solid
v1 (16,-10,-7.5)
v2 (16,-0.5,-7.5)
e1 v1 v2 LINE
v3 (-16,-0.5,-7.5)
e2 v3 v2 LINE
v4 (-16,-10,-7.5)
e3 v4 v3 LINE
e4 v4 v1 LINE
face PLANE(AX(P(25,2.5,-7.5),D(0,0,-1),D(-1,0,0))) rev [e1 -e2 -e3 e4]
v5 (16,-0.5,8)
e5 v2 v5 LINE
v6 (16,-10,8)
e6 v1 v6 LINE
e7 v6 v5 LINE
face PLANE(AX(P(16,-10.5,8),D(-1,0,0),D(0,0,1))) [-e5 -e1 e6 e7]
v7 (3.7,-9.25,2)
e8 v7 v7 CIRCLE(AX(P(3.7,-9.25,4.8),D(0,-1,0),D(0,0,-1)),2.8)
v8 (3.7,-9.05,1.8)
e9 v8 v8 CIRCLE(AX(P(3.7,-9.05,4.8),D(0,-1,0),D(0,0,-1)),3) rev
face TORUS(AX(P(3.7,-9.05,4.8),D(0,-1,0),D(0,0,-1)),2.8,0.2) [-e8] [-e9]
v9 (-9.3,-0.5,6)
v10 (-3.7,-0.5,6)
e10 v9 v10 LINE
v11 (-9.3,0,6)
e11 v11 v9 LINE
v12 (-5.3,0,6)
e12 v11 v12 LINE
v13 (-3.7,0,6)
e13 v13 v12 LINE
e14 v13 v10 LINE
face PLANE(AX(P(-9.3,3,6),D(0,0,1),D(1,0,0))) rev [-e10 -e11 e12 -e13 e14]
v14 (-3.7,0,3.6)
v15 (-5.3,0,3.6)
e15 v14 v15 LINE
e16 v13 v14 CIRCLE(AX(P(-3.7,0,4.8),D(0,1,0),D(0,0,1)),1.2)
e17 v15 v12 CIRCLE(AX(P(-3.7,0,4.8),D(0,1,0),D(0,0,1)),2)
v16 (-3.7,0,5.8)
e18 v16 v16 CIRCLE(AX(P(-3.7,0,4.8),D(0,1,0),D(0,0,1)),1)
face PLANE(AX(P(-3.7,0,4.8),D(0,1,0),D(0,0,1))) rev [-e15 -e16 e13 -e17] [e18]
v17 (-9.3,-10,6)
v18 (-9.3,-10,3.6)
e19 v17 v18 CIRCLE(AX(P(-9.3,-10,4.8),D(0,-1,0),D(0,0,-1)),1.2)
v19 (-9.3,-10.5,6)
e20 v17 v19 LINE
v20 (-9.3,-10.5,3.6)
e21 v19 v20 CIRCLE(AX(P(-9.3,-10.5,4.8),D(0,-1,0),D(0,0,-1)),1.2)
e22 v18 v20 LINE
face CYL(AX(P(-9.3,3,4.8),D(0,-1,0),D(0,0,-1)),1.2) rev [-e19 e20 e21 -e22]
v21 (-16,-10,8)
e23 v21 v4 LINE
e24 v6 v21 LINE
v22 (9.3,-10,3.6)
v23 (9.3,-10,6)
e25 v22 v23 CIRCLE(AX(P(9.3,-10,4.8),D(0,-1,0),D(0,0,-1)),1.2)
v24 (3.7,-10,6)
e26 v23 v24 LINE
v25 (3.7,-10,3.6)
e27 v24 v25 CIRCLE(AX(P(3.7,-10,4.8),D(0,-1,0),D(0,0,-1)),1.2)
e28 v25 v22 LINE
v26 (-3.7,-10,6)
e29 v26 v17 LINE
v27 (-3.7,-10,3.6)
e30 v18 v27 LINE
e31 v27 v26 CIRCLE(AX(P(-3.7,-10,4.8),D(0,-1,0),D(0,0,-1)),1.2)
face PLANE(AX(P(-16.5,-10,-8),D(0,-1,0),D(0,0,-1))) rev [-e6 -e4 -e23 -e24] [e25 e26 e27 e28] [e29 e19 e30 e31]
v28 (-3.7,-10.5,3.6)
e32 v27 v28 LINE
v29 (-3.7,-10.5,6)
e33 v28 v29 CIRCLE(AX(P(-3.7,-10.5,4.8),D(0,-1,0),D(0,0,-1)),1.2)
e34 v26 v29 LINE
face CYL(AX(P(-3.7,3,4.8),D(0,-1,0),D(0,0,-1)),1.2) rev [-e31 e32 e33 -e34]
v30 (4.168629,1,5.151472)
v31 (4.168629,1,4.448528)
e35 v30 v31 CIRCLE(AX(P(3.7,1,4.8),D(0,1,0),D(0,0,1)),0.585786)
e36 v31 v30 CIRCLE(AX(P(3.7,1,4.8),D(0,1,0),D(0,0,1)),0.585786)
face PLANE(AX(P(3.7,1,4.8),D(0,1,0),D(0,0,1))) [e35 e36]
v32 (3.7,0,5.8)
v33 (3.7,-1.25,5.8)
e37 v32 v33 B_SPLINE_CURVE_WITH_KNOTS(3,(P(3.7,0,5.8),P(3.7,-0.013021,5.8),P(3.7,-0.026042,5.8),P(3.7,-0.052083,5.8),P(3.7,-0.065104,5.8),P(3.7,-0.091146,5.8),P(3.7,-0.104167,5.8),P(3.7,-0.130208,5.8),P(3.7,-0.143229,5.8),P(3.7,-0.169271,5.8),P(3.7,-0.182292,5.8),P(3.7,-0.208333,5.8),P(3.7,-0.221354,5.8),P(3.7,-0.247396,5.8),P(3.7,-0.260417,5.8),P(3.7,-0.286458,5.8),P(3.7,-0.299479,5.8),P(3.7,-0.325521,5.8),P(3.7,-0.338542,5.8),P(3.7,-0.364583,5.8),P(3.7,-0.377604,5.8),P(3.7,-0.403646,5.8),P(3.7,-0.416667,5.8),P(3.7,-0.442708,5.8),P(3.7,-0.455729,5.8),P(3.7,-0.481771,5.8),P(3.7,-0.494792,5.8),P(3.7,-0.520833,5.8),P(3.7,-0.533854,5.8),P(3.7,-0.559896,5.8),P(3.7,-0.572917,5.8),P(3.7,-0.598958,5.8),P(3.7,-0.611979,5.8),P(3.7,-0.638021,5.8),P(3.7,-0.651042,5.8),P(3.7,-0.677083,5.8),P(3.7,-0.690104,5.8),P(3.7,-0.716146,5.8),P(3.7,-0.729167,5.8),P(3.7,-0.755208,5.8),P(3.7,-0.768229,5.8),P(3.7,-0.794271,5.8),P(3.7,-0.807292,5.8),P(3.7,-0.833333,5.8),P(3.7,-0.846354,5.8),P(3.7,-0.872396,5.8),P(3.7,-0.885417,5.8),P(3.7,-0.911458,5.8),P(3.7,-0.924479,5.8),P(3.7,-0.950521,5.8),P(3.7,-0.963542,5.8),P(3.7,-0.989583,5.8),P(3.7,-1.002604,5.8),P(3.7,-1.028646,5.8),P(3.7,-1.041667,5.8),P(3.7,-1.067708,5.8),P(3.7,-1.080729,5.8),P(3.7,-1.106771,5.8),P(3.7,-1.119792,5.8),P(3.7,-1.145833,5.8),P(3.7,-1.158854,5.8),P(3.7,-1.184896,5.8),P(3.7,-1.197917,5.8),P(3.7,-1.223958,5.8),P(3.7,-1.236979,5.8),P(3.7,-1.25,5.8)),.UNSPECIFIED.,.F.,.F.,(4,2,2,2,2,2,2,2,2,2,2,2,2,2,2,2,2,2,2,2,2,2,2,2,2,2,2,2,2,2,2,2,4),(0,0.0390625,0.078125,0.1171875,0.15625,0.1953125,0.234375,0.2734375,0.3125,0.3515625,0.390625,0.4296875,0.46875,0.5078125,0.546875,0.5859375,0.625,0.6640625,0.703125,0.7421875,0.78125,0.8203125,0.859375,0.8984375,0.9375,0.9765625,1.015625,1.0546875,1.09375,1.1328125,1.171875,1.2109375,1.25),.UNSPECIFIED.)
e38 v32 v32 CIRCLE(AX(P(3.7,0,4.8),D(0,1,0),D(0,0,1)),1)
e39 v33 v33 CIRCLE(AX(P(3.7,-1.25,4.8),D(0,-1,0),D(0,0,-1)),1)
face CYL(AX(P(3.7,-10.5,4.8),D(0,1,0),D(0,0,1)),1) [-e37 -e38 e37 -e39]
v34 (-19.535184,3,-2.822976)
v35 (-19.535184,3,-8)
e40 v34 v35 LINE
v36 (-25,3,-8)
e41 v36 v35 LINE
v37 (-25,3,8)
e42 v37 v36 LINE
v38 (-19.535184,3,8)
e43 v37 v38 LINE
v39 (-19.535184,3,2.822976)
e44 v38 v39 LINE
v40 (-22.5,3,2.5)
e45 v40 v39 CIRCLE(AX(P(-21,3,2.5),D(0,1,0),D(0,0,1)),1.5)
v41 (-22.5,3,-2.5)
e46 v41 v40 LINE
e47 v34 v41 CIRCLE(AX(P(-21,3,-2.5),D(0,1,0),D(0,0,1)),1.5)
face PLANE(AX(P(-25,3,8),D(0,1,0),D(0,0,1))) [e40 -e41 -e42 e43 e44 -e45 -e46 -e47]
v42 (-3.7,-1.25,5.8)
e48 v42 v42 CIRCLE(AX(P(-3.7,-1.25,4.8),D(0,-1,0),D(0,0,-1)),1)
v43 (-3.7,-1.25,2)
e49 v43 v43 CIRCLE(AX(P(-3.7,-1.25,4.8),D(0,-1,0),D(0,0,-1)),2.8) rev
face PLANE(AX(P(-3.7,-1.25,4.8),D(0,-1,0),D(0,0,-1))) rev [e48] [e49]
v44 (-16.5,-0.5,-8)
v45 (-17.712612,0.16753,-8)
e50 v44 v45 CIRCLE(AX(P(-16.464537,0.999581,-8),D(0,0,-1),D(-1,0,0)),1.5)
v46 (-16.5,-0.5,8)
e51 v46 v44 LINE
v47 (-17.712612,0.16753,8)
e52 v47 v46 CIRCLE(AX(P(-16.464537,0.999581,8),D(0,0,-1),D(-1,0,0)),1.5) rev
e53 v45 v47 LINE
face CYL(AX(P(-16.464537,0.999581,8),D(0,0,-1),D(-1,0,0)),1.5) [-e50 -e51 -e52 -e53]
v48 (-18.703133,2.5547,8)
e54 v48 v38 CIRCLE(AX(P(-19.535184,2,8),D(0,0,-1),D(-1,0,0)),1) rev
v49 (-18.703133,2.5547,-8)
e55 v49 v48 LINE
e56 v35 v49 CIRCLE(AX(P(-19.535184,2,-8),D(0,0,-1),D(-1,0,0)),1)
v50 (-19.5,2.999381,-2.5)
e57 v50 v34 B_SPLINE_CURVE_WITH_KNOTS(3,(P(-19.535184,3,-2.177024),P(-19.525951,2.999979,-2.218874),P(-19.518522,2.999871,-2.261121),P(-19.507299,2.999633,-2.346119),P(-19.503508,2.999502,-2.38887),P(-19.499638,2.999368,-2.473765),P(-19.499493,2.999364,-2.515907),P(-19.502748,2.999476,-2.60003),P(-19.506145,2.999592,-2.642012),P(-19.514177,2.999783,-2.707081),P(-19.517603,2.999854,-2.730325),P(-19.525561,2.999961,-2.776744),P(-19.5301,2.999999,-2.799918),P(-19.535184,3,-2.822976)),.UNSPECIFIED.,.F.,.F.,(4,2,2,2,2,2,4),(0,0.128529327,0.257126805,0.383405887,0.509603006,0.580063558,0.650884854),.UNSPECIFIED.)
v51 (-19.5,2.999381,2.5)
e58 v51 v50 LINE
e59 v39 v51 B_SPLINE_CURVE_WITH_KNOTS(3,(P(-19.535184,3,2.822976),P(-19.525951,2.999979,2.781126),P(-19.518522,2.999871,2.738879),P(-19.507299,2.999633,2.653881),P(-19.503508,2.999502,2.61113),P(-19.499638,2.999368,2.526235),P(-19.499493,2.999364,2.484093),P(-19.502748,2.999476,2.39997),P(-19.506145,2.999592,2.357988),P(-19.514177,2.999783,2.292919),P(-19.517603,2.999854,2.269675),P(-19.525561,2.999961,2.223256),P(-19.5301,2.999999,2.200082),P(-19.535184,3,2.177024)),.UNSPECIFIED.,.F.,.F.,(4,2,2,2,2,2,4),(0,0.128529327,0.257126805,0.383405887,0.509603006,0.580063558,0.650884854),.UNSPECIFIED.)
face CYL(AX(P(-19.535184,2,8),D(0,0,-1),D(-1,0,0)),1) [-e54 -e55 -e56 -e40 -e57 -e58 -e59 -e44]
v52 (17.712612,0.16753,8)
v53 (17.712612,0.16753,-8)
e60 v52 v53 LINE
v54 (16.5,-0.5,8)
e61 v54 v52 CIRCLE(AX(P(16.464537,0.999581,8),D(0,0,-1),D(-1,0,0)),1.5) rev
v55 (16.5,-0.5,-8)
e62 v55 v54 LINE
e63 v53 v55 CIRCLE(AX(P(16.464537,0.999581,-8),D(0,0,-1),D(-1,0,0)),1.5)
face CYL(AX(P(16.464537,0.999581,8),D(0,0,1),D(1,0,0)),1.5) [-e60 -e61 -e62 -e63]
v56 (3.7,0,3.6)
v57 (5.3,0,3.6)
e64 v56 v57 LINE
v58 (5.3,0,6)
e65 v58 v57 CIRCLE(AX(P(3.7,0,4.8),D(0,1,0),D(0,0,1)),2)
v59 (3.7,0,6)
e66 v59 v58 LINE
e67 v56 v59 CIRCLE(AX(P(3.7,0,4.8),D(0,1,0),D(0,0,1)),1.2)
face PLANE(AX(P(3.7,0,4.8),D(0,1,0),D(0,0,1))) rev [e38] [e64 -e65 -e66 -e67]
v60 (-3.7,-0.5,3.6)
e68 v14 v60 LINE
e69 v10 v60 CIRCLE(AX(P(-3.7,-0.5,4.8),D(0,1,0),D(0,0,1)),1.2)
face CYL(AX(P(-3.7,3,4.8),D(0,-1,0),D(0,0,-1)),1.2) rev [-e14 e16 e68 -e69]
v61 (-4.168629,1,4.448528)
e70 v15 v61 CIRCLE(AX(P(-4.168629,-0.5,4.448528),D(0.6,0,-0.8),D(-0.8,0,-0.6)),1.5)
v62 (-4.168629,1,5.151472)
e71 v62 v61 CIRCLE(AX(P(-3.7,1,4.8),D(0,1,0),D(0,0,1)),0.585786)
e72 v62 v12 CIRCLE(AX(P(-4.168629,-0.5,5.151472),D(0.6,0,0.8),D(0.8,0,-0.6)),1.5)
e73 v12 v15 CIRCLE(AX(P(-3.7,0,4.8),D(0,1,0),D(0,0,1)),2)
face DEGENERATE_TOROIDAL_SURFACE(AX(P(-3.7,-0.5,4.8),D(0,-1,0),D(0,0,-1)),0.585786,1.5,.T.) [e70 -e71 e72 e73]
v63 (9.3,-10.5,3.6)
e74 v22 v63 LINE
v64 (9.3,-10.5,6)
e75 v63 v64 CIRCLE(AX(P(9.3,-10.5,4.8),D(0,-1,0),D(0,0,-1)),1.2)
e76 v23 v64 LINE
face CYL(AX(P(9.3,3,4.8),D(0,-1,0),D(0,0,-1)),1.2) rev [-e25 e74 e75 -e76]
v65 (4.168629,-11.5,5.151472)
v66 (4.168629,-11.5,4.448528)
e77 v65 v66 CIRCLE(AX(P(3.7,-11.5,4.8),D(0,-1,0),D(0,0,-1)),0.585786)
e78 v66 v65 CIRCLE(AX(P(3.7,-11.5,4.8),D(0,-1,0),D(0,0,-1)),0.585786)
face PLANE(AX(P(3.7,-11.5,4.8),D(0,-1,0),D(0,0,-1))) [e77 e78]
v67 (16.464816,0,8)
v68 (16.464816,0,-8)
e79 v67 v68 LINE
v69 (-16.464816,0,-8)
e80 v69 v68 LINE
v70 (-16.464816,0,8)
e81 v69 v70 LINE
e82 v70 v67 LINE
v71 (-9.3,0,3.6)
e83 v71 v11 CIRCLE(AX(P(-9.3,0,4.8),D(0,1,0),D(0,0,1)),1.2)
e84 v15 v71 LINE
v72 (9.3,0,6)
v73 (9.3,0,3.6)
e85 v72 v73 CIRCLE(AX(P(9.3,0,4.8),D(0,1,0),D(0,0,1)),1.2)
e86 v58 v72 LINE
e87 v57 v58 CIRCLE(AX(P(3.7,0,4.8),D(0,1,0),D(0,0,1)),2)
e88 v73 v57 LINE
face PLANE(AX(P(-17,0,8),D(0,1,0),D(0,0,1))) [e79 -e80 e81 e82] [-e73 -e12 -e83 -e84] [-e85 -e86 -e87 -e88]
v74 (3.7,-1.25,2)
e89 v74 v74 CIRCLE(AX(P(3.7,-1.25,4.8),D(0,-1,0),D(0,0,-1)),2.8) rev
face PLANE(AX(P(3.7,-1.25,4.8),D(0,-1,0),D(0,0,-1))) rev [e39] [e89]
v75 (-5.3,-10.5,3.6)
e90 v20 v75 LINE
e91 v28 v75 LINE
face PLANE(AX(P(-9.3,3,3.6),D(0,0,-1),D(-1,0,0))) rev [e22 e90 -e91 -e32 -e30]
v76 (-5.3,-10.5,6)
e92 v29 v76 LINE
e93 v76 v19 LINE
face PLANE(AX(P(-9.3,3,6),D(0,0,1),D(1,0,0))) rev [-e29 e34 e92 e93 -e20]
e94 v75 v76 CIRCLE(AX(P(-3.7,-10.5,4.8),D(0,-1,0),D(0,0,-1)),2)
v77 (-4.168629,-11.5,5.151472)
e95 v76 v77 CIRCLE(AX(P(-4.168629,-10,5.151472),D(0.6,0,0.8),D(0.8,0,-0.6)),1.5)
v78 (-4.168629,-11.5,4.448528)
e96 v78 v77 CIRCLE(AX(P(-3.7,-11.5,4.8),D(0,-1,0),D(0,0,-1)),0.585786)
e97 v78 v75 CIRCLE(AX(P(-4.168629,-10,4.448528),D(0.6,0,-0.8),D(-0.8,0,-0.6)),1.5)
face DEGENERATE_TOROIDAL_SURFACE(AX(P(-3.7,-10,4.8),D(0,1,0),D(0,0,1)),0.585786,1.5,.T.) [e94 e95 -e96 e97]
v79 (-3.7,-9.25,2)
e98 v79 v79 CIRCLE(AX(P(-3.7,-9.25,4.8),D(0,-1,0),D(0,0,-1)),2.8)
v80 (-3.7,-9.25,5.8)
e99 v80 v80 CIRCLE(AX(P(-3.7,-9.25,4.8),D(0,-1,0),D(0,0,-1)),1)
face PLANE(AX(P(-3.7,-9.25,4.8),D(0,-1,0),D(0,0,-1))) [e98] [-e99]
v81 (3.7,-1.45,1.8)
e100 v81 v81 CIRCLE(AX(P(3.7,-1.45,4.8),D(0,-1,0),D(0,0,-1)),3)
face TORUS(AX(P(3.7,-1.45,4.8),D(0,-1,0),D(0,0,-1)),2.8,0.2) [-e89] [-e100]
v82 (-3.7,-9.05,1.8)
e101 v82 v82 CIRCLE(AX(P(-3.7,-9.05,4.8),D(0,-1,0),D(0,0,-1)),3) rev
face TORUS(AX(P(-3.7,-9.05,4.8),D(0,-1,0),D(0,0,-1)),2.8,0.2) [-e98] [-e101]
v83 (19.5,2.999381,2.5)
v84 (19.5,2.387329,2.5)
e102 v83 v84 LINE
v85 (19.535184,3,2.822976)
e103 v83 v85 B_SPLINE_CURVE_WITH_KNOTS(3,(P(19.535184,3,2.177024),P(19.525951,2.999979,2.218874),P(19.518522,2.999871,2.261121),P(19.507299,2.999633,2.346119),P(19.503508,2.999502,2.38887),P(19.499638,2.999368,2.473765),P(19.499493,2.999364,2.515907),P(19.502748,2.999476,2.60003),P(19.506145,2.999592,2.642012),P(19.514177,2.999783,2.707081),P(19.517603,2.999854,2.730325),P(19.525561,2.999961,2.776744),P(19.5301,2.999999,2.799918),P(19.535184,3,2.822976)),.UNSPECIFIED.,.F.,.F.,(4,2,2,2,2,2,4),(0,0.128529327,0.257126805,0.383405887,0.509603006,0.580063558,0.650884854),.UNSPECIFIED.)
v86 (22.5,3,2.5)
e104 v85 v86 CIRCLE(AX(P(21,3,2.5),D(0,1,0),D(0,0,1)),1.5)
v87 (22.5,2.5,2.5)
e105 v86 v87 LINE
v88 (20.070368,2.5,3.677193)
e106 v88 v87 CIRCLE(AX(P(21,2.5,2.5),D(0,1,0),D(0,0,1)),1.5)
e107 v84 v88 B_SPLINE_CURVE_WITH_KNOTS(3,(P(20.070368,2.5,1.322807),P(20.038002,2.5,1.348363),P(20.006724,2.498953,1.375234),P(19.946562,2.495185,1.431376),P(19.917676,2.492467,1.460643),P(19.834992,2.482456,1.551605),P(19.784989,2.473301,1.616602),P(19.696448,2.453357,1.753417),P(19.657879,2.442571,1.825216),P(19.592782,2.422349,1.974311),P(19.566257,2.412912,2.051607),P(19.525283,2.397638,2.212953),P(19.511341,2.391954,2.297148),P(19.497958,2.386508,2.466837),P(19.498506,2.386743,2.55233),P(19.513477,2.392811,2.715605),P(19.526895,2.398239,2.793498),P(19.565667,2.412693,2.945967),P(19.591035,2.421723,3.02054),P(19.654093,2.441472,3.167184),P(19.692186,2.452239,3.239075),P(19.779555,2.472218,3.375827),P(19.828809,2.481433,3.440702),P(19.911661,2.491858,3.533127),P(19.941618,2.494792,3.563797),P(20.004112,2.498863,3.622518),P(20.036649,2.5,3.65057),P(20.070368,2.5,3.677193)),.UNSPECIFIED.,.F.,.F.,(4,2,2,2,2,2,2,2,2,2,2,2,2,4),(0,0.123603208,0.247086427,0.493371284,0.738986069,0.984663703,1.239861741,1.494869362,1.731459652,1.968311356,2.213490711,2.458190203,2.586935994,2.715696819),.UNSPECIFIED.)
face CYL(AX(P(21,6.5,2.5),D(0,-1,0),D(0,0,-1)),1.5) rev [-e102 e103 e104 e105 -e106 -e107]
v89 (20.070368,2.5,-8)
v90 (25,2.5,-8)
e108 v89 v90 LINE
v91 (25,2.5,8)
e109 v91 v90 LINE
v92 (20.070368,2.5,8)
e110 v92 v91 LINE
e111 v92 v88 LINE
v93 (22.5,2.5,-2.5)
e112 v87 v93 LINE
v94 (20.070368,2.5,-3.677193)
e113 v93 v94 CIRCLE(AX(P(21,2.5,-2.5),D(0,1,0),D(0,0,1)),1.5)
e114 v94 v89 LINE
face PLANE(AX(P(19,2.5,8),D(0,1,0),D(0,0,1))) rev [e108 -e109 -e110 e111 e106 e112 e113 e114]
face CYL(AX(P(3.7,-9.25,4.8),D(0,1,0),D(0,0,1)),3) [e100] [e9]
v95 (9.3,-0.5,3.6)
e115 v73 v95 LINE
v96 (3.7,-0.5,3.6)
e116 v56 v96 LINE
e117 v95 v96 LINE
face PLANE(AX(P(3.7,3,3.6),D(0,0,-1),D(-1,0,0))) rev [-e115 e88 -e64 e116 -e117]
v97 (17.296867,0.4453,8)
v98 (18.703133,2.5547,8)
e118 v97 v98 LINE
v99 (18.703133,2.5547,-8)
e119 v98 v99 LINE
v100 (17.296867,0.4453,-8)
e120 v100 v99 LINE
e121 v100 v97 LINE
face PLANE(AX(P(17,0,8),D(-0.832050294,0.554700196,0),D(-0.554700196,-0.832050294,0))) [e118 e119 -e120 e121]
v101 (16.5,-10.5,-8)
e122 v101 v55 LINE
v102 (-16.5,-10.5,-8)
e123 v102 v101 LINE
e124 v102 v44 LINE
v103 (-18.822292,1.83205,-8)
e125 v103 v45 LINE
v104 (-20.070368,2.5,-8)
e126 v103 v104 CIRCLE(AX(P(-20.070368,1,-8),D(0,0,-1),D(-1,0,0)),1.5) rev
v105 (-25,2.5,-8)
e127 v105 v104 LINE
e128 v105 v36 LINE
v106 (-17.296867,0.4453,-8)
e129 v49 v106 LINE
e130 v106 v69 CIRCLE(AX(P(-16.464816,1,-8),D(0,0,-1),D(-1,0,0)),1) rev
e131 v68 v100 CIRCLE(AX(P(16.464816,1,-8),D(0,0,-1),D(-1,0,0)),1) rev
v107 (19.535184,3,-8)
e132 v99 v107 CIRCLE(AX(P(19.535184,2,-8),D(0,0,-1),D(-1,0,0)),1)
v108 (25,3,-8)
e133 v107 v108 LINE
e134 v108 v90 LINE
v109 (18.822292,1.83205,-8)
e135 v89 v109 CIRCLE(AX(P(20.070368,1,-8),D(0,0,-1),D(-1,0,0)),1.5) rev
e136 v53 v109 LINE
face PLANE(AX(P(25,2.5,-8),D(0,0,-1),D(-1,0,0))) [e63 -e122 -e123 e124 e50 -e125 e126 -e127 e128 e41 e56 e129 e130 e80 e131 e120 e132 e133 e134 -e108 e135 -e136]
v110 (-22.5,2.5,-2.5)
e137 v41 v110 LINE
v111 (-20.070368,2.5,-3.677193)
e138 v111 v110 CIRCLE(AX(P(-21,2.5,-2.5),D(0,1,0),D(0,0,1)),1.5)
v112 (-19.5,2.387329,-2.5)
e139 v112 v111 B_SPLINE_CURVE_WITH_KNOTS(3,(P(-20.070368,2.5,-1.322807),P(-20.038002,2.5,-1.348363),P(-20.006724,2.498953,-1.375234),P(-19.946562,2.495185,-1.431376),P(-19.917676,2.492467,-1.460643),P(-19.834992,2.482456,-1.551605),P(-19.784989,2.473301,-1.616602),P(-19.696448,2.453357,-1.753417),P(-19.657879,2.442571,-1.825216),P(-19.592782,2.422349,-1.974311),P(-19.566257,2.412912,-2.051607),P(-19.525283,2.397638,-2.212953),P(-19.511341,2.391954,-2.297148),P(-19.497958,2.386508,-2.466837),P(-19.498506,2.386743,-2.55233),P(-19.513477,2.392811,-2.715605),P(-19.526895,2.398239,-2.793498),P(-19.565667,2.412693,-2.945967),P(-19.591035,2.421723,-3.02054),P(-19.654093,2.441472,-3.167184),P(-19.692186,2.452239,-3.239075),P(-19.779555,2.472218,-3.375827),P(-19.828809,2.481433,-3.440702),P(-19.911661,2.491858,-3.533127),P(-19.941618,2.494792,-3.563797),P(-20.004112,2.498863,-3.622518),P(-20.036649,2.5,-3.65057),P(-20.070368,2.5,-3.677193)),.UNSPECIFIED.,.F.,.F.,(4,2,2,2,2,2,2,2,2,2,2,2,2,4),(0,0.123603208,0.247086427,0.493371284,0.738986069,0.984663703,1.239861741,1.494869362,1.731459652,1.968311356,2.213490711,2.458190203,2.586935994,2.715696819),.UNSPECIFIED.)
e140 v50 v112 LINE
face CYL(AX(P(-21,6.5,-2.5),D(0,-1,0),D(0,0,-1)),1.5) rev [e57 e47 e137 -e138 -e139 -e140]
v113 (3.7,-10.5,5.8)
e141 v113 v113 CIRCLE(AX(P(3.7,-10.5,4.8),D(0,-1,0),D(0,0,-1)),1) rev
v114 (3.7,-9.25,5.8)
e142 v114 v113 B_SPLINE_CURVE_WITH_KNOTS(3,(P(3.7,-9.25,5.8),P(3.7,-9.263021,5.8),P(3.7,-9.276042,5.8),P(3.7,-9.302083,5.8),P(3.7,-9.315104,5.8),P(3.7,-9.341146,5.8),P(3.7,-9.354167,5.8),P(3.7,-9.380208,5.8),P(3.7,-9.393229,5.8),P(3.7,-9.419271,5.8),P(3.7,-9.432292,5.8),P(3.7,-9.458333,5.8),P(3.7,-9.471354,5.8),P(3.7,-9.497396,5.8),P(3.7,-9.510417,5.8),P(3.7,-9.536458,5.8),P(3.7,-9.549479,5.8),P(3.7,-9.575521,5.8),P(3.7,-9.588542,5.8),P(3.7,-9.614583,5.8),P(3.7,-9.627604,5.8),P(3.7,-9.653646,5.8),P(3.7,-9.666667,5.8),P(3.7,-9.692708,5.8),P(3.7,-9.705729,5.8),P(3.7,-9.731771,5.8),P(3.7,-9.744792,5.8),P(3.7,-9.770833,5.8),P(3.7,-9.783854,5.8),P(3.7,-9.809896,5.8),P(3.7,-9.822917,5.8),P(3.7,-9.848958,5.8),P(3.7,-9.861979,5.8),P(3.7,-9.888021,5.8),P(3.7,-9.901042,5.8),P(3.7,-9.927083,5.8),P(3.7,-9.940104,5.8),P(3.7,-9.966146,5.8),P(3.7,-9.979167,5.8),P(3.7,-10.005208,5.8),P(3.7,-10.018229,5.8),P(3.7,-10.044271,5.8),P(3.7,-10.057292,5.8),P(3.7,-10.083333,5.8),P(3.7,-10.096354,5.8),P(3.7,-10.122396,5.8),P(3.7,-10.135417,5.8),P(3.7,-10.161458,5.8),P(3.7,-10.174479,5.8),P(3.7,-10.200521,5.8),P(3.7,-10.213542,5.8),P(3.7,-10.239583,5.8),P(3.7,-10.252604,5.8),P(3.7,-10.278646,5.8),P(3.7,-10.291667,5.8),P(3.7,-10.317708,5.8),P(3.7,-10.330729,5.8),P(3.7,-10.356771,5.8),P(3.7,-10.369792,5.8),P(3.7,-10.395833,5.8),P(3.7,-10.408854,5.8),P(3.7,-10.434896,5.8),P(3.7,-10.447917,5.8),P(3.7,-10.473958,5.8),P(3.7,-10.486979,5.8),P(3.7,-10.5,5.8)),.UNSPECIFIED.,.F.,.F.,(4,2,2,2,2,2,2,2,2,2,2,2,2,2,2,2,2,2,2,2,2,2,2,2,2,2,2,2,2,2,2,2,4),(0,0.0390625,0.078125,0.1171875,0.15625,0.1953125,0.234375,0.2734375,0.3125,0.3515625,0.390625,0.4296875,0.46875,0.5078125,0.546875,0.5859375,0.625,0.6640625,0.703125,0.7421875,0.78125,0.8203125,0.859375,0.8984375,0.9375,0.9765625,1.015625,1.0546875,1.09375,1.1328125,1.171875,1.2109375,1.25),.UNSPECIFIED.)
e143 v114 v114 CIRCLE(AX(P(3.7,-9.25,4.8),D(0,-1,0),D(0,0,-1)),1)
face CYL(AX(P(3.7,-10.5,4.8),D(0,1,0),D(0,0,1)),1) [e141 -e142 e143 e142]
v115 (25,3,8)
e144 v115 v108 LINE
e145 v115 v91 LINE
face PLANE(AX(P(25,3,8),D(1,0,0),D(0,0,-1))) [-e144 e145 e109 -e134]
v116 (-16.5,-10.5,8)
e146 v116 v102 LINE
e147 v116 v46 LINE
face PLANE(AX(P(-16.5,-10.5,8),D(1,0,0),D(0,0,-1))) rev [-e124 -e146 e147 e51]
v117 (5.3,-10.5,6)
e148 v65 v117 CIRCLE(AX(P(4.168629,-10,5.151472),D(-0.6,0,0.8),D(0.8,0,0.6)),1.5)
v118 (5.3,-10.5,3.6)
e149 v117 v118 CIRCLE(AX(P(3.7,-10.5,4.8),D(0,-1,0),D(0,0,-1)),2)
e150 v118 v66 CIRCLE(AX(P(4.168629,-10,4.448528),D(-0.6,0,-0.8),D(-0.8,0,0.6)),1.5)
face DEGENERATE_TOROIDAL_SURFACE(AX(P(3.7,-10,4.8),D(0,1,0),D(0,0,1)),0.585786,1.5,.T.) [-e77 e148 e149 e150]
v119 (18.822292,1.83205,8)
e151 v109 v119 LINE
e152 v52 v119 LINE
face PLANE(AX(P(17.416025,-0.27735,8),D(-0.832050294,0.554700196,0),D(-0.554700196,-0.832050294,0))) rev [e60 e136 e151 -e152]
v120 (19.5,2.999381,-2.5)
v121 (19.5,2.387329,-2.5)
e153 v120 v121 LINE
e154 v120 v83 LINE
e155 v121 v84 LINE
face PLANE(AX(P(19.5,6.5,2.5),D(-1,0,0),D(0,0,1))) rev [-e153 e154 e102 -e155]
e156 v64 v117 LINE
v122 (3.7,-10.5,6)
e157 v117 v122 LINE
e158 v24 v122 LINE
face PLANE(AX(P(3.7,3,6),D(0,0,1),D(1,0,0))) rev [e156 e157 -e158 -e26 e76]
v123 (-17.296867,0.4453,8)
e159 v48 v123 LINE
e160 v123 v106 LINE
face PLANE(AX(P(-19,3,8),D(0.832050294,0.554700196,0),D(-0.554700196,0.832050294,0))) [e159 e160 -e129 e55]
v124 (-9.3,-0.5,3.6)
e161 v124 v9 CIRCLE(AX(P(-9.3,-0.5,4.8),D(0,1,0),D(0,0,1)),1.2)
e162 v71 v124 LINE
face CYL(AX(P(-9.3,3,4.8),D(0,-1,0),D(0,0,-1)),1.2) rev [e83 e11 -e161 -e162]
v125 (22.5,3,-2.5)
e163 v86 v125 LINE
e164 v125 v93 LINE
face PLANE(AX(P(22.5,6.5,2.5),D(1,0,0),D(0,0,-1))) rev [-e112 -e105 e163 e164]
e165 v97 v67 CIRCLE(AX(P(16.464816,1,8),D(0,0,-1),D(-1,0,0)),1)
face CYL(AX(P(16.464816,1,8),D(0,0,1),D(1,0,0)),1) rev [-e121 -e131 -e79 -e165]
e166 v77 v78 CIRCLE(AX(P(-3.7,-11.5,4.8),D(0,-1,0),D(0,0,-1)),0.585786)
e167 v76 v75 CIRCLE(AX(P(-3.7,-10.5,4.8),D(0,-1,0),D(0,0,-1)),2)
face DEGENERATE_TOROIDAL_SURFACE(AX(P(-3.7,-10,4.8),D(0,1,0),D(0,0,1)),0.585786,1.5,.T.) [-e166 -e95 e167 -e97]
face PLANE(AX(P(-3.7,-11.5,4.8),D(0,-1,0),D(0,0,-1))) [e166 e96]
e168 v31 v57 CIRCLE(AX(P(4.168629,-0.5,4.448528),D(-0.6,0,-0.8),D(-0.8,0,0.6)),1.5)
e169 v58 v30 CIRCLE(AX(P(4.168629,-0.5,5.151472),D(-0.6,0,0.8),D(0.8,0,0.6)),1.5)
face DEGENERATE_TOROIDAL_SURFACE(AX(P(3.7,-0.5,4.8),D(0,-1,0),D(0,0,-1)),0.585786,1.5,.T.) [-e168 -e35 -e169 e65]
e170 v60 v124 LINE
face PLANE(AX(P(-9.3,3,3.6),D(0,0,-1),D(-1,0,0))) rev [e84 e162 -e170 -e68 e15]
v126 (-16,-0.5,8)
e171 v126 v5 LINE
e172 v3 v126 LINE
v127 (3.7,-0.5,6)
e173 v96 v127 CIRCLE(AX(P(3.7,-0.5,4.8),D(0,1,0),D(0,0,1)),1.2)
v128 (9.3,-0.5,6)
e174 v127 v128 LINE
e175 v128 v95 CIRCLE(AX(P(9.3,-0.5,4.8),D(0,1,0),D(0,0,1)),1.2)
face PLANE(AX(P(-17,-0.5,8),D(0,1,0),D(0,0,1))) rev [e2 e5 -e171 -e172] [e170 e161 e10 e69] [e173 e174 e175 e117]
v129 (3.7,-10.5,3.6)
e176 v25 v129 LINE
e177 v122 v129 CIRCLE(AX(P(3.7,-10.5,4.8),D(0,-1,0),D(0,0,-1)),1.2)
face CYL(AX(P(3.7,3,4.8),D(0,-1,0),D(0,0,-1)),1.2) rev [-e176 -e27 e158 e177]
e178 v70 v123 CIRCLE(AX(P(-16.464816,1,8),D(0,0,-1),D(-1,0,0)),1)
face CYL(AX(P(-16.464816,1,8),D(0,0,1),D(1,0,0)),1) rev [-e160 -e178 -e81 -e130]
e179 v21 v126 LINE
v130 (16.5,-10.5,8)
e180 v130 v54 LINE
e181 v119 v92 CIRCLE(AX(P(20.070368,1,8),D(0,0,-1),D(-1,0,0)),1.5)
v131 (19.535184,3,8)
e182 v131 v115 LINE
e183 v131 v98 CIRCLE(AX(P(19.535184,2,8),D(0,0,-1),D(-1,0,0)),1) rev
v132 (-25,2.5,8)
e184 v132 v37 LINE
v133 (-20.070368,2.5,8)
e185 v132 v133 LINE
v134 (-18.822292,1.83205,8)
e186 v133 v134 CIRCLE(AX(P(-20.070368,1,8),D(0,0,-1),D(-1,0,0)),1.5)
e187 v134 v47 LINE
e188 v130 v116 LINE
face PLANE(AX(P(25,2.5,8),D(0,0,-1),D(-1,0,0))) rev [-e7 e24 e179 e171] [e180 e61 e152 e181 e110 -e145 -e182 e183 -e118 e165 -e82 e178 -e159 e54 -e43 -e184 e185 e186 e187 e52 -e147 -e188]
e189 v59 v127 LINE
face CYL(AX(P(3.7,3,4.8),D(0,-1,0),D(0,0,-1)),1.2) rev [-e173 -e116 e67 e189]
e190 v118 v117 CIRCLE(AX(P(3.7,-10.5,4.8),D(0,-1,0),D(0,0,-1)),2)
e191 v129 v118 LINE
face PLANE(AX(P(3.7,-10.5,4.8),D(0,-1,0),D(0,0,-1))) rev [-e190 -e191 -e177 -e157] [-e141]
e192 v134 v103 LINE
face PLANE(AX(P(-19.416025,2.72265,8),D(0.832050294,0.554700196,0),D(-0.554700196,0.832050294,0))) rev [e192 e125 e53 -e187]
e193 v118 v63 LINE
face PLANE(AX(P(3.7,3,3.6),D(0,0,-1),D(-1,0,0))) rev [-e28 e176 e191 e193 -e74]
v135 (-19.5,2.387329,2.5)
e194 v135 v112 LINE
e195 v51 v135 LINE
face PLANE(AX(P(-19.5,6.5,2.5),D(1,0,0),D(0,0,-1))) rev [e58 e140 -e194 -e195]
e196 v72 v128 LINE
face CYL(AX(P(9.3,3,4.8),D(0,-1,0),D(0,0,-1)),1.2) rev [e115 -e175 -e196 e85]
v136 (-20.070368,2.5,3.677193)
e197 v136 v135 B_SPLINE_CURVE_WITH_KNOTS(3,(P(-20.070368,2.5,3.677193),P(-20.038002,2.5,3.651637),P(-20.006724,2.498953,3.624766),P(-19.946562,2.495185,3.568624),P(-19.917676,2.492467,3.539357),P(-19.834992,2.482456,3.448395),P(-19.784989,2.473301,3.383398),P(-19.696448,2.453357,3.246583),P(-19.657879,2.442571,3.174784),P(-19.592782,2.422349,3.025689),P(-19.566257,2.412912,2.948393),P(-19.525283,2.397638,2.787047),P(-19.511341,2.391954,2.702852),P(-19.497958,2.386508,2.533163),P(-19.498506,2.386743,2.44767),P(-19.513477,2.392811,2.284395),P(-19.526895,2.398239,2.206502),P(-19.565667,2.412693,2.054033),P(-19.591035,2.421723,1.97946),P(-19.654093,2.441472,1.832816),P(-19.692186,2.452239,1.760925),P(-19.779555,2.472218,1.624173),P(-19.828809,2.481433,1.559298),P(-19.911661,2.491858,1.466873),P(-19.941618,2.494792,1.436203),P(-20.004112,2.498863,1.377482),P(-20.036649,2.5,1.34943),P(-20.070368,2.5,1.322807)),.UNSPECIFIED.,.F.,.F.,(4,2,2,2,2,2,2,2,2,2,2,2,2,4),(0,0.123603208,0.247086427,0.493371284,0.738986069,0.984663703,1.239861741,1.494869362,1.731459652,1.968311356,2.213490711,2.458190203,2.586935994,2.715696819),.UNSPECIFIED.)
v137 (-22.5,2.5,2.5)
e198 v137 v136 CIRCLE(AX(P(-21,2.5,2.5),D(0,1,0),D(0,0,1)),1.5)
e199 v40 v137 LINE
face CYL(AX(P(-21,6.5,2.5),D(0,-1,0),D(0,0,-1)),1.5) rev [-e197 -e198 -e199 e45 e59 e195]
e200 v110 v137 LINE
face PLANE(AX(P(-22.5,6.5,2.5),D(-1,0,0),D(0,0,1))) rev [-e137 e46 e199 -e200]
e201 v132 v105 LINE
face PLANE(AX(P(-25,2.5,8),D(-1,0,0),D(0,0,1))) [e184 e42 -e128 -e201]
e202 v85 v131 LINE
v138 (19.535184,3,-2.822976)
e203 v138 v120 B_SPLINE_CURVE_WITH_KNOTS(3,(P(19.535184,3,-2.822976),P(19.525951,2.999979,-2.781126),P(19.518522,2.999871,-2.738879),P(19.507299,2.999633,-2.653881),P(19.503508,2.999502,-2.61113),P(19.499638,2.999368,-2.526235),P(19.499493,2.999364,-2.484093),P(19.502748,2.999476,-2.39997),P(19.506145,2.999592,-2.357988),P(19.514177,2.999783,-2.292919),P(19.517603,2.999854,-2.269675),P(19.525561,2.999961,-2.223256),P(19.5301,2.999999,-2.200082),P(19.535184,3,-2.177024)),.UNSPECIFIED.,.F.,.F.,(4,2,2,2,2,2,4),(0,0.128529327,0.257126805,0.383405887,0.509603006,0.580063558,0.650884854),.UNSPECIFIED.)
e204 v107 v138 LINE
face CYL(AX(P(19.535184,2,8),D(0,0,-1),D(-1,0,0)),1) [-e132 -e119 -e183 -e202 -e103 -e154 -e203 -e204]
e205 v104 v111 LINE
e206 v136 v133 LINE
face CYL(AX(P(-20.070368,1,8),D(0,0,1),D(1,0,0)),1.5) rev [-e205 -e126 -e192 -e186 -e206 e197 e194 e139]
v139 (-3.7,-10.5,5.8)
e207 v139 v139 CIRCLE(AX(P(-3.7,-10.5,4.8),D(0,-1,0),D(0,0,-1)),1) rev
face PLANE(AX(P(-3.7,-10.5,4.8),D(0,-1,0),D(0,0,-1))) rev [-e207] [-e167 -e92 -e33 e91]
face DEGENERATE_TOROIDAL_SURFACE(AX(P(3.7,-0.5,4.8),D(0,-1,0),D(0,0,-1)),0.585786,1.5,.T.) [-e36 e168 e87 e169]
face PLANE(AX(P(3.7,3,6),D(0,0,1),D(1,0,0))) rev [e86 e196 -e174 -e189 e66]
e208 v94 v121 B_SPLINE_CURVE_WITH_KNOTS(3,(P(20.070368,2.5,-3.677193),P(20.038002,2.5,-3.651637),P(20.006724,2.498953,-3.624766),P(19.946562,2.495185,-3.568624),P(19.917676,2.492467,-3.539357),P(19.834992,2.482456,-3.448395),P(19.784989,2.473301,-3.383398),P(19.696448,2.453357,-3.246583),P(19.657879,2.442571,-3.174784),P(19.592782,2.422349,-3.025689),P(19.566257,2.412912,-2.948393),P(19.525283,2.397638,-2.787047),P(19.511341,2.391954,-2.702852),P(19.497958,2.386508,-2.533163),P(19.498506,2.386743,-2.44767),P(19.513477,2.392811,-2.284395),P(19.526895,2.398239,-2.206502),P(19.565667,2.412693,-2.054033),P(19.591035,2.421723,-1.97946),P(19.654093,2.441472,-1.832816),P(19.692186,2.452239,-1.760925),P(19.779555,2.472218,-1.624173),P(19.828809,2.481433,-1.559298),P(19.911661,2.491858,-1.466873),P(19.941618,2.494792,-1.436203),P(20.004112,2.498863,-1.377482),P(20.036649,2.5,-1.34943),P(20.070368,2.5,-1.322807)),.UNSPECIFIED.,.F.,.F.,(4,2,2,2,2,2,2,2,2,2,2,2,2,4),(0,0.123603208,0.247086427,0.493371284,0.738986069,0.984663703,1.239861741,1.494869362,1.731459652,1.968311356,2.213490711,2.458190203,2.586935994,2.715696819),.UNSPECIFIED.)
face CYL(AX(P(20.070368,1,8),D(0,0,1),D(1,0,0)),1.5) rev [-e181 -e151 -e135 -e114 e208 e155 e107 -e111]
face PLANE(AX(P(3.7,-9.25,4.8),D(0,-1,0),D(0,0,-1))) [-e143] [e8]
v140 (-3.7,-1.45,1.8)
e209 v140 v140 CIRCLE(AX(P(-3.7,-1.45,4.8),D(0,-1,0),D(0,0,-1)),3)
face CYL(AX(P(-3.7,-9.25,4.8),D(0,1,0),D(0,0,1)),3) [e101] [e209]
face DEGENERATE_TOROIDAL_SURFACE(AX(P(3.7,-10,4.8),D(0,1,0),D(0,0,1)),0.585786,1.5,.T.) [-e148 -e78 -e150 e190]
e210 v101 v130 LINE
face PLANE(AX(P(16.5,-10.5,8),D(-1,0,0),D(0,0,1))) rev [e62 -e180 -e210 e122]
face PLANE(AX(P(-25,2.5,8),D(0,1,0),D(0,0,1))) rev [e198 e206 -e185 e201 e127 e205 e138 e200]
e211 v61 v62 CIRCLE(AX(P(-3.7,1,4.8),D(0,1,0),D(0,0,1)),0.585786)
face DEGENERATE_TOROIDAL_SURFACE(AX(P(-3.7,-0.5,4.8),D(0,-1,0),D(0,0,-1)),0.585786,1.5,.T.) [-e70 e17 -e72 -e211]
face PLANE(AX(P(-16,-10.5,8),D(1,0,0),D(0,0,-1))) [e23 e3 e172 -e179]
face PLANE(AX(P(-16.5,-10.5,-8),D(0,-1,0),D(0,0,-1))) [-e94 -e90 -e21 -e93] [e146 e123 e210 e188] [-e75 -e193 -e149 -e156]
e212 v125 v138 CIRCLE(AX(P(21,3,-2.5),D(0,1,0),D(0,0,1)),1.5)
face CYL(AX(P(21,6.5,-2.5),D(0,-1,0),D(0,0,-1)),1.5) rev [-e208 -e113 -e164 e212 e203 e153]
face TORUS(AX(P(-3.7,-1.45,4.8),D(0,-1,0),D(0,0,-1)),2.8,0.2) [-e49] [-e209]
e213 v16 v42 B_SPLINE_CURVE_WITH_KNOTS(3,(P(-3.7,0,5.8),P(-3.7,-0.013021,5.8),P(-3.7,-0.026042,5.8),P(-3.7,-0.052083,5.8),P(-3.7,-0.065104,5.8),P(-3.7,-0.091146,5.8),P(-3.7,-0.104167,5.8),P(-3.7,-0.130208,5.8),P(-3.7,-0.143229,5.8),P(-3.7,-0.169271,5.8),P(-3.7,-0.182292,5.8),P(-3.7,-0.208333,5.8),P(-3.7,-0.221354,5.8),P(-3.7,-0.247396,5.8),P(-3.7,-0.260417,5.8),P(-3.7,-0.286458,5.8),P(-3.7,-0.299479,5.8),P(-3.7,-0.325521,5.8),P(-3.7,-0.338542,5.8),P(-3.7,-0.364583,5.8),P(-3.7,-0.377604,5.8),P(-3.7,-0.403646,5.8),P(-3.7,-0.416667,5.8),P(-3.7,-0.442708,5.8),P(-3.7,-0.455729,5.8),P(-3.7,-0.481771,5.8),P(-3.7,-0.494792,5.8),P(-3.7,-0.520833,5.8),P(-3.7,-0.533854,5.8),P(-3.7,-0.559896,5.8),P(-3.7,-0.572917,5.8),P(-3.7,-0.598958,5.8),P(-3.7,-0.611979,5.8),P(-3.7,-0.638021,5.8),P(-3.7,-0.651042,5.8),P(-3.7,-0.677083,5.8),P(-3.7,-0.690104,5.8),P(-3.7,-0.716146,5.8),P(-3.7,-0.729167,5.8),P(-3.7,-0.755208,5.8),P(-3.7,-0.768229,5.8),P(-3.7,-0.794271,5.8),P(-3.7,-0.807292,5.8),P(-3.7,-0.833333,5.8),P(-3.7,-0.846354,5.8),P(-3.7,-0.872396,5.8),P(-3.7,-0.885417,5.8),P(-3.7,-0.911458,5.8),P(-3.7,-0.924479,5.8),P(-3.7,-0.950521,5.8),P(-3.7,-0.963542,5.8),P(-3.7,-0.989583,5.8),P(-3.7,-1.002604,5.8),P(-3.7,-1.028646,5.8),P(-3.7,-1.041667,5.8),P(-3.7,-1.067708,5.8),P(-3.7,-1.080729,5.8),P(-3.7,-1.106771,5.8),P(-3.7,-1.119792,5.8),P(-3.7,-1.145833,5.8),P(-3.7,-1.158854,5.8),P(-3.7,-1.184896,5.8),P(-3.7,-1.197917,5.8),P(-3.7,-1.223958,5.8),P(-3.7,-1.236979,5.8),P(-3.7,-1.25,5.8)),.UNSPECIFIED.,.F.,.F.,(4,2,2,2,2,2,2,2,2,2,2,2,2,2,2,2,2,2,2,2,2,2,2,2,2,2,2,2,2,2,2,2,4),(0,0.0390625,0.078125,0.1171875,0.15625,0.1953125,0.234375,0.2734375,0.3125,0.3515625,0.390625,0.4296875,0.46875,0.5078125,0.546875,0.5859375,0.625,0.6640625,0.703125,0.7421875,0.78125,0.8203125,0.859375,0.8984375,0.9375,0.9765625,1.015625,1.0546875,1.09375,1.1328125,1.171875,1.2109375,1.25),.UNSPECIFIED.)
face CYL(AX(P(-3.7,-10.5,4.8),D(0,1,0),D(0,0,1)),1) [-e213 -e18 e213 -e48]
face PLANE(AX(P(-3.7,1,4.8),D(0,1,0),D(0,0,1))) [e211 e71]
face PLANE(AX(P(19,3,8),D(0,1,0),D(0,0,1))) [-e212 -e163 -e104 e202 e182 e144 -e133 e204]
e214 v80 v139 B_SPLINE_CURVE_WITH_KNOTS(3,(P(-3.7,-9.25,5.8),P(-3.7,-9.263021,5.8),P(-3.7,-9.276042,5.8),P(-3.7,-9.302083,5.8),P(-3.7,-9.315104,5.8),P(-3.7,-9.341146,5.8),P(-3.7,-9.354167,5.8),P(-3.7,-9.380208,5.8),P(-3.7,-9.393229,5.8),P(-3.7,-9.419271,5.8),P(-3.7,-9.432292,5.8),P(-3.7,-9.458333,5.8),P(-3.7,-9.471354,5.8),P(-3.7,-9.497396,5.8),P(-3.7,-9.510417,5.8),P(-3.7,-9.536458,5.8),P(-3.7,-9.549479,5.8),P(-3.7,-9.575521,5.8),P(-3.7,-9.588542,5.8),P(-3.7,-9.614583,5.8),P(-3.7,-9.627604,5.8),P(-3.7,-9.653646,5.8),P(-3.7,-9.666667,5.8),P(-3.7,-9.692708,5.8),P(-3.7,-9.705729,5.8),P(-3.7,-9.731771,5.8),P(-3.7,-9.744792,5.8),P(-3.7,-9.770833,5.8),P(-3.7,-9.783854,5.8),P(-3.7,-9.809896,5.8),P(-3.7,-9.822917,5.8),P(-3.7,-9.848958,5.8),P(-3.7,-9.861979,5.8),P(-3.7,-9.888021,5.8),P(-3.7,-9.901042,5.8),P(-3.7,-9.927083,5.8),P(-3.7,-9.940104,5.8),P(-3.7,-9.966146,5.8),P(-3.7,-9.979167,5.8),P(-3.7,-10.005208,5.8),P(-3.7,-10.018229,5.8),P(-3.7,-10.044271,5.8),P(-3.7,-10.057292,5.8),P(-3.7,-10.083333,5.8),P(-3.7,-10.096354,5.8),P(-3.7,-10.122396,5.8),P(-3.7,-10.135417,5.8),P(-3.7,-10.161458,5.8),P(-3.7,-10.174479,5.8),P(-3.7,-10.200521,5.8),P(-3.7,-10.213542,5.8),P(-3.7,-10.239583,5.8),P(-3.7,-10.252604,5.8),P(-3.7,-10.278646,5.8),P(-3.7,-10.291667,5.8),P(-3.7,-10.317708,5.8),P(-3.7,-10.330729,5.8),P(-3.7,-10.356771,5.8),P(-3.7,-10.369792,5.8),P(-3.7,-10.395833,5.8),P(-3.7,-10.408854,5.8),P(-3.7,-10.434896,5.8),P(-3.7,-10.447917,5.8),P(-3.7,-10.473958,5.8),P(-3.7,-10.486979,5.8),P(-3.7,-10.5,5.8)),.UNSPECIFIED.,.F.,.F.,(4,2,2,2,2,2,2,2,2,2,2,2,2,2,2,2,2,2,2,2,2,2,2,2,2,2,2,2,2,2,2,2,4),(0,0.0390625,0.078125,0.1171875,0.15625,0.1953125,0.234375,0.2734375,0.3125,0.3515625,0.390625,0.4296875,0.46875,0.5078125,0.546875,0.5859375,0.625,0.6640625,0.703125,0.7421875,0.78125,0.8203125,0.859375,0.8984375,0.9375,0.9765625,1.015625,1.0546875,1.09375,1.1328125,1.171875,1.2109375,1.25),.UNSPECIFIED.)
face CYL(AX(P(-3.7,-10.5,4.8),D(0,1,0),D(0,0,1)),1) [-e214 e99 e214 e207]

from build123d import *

# Parameters (mm, degrees)
EXTRUDE_1_DEPTH     = 8
SKETCH_2_W          = 33
SKETCH_2_H          = 16
EXTRUDE_1_2_DEPTH   = 10
SHELL_START         = -10
SHELL_1_OUTLINE_W   = 32
SHELL_1_OUTLINE_H   = 15.5
SHELL_1_DEPTH       = 9.5
FILLET_1_R          = 1.5
FILLET_2_R          = 1
CUT_EXTRUDE_1_DEPTH = 30.516944286
SKETCH_4_R          = 1
EXTRUDE_2_DEPTH     = 5.25
EXTRUDE_2_2_DEPTH   = 5.25
SKETCH_5_R          = 2
EXTRUDE_3_DEPTH     = 1
FILLET_3_R          = 1.5
SKETCH_6_R          = 2
EXTRUDE_4_DEPTH     = 1
FILLET_4_R          = 1.5
SKETCH_7_R          = 3
EXTRUDE_5_DEPTH     = 4
CUT_EXTRUDE_2_DEPTH = 4
FILLET_5_R          = 0.2


# Read off the part's stored shape, not the designer's step: 抽壳1
with BuildPart() as part:
    # 草图1 → Extrude 1 (new, symmetric)
    with BuildSketch(Plane.XY):
        Polygon((-25, 3), (-19, 3), (-17, 0), (17, 0), (19, 3), (25, 3), (25, 2.5), (19.267591879, 2.5), (17.267591879, -0.5), (-17.267591879, -0.5), (-19.267591879, 2.5), (-25, 2.5), align=None)
    extrude(amount=EXTRUDE_1_DEPTH, both=True)

    # 草图2 → Extrude 1 2 (add)
    with BuildSketch(Plane.XZ.offset(0.5)):
        Rectangle(SKETCH_2_W, SKETCH_2_H)
    extrude(amount=EXTRUDE_1_2_DEPTH)

    # 抽壳1 outline → 抽壳1 (cut)
    with BuildSketch(Plane(origin=(0, 0, 0), x_dir=(1, 0, 0), z_dir=(0, 1, 0)).offset(SHELL_START)):
        with Locations((0, -0.25)):
            Rectangle(SHELL_1_OUTLINE_W, SHELL_1_OUTLINE_H)
    extrude(amount=SHELL_1_DEPTH, mode=Mode.SUBTRACT)

    # 圆角1
    # the kernel refuses this fillet: 1.5 mm, written as the material it adds along each edge
    with BuildSketch(Plane(origin=(19.267591879, 2.5, 8), x_dir=(1, 0, 0), z_dir=(0, 0, -1)), Plane(origin=(-19.267591879, 2.5, -8), x_dir=(-1, 0, 0), z_dir=(0, 0, 1))) as fillet_1_piece_1:
        with BuildLine():
            CenterArc((FILLET_1_R * 0.535183758488, FILLET_1_R), FILLET_1_R, 213.690067526, 56.309932474)
            Line((-FILLET_1_R * 0.29686653585, FILLET_1_R * 0.445299803775), (0, 0))
            Line((0, 0), (FILLET_1_R * 0.535183758488, 0))
        make_face()
    extrude(amount=16)
    # the kernel refuses this fillet: 1.5 mm, written as the material it takes off along each edge
    with BuildSketch(Plane(origin=(17.267591879, -0.5, 10.006939094), x_dir=(0.5547001962252275, 0.8320502943378448, 0), z_dir=(0, 0, -1))) as fillet_1_2_piece_1_section:
        with BuildLine():
            CenterArc((FILLET_1_R * 0.535183758488, -FILLET_1_R), FILLET_1_R, 90, 56.309932474)
            Line((-FILLET_1_R * 0.29686653585, -FILLET_1_R * 0.445299803775), (0, 0))
            Line((0, 0), (FILLET_1_R * 0.535183758488, 0))
        make_face()
    fillet_1_2_piece_1 = extrude(amount=20.013878189, mode=Mode.PRIVATE)
    fillet_1_2_piece_1 = split(fillet_1_2_piece_1, bisect_by=Plane(origin=(16.5, -0.354791462, 0), z_dir=(1, 0, 0)), keep=Keep.TOP, mode=Mode.PRIVATE)
    add(fillet_1_2_piece_1, mode=Mode.SUBTRACT)
    with BuildSketch(Plane(origin=(-17.267591879, -0.5, 10.006939094), x_dir=(1, 0, 0), z_dir=(0, 0, -1))) as fillet_1_2_piece_2_section:
        with BuildLine():
            CenterArc((FILLET_1_R * 0.535183758488, -FILLET_1_R), FILLET_1_R, 90, 56.309932474)
            Line((-FILLET_1_R * 0.29686653585, -FILLET_1_R * 0.445299803775), (0, 0))
            Line((0, 0), (FILLET_1_R * 0.535183758488, 0))
        make_face()
    fillet_1_2_piece_2 = extrude(amount=20.013878189, mode=Mode.PRIVATE)
    fillet_1_2_piece_2 = split(fillet_1_2_piece_2, bisect_by=Plane(origin=(-16.5, -0.354791462, 0), z_dir=(-1, 0, 0)), keep=Keep.TOP, mode=Mode.PRIVATE)
    add(fillet_1_2_piece_2, mode=Mode.SUBTRACT)

    # 圆角2
    fillet_2_edges = [part.edges().sort_by_distance(p)[0] for p in [
        (-19, 3, 0),
        (-17, 0, 0),
        (17, 0, 0),
        (19, 3, 0),
    ]]
    fillet(fillet_2_edges, radius=FILLET_2_R)

    # 草图3 → 切除-拉伸1 (cut, through all)
    with BuildSketch(Plane.XZ.offset(10.5)):
        with BuildLine():
            Line((-9.3, 6), (-3.7, 6))
            ThreePointArc((-3.7, 6), (-2.5, 4.8), (-3.7, 3.6))
            Line((-3.7, 3.6), (-9.3, 3.6))
            ThreePointArc((-9.3, 3.6), (-10.5, 4.8), (-9.3, 6))
        make_face()
        with BuildLine():
            Line((3.7, 6), (9.3, 6))
            ThreePointArc((9.3, 6), (10.5, 4.8), (9.3, 3.6))
            Line((9.3, 3.6), (3.7, 3.6))
            ThreePointArc((3.7, 3.6), (2.5, 4.8), (3.7, 6))
        make_face()
    extrude(amount=-CUT_EXTRUDE_1_DEPTH, mode=Mode.SUBTRACT)



with BuildPart() as body_2:
    # 草图4 → 凸台-拉伸2 (new, symmetric)
    with BuildSketch(Plane.XZ.offset(5.25)):
        with Locations(Location((3.7, 4.8, 0), (0, 0, 90))):
            Circle(SKETCH_4_R)
    extrude(amount=EXTRUDE_2_DEPTH, both=True)


with BuildPart() as body_3:
    # 草图4 → Extrude 2 2 (new, symmetric)
    with BuildSketch(Plane.XZ.offset(5.25)):
        with Locations(Location((-3.7, 4.8, 0), (0, 0, 90))):
            Circle(SKETCH_4_R)
    extrude(amount=EXTRUDE_2_2_DEPTH, both=True)


with BuildPart() as part_1:
    add(part.part)

    add(body_2.part)  # 凸台-拉伸3 merges body 2

    add(body_3.part)  # 凸台-拉伸3 merges body 3
    # 草图5 → 凸台-拉伸3 (add)
    with BuildSketch(Plane.XZ.offset(10.5)):
        with Locations(Location((3.7, 4.8, 0), (0, 0, 36.869897646))):
            Circle(SKETCH_5_R)
        with Locations(Location((-3.7, 4.8, 0), (0, 0, 143.130102354))):
            Circle(SKETCH_5_R)
    extrude(amount=EXTRUDE_3_DEPTH)

    # 圆角3
    # the kernel refuses this fillet: 1.5 mm, written as the material it takes off along each edge
    with BuildSketch(Plane(origin=(3.7, -11.5, 4.8), x_dir=(0.7999999999983667, 0, 0.6000000000021778), z_dir=(0.6000000000021778, 0, -0.7999999999983667))) as fillet_3_piece_1:
        with BuildLine():
            CenterArc((0.585786438, -1.5), FILLET_3_R, 19.471220634, 70.528779366)
            Line((0.585786438, 0), (0.585786438, 0.03))
            Line((0.585786438, 0.03), (2, 0.03))
            Line((2, 0.03), (2.03, 0))
            ThreePointArc((2.03, 0), (2.03, -0.5), (2.028284271, -0.99))
            Line((2.028284271, -0.99), (2, -1))
        make_face()
    revolve(axis=Axis((3.7, -11.5, 4.8), (0, -1, 0)), mode=Mode.SUBTRACT)
    with BuildSketch(Plane(origin=(-3.7, -11.5, 4.8), x_dir=(-0.7999999999983667, 0, 0.6000000000021778), z_dir=(0.6000000000021778, 0, 0.7999999999983667))) as fillet_3_piece_2:
        with BuildLine():
            CenterArc((0.585786438, -1.5), FILLET_3_R, 19.471220634, 70.528779366)
            Line((0.585786438, 0), (0.585786438, 0.03))
            Line((0.585786438, 0.03), (2, 0.03))
            Line((2, 0.03), (2.03, 0))
            ThreePointArc((2.03, 0), (2.03, -0.5), (2.028284271, -0.99))
            Line((2.028284271, -0.99), (2, -1))
        make_face()
    revolve(axis=Axis((-3.7, -11.5, 4.8), (0, -1, 0)), mode=Mode.SUBTRACT)

    # 草图6 → 凸台-拉伸4 (add)
    with BuildSketch(Plane(origin=(0, 0, 0), x_dir=(1, 0, 0), z_dir=(0, 1, 0))):
        with Locations(Location((3.7, -4.8, 0), (0, 0, 36.869897646))):
            Circle(SKETCH_6_R)
        with Locations(Location((-3.7, -4.8, 0), (0, 0, 143.130102354))):
            Circle(SKETCH_6_R)
    extrude(amount=EXTRUDE_4_DEPTH)

    # 圆角4
    # the kernel refuses this fillet: 1.5 mm, written as the material it takes off along each edge
    with BuildSketch(Plane(origin=(3.7, 1, 4.8), x_dir=(0.7999999999983667, 0, -0.6000000000021778), z_dir=(0.6000000000021778, 0, 0.7999999999983667))) as fillet_4_piece_1:
        with BuildLine():
            CenterArc((0.585786438, -1.5), FILLET_4_R, 19.471220634, 70.528779366)
            Line((0.585786438, 0), (0.585786438, 0.03))
            Line((0.585786438, 0.03), (2, 0.03))
            Line((2, 0.03), (2.03, 0))
            ThreePointArc((2.03, 0), (2.03, -0.5), (2.028284271, -0.99))
            Line((2.028284271, -0.99), (2, -1))
        make_face()
    revolve(axis=Axis((3.7, 1, 4.8), (0, 1, 0)), mode=Mode.SUBTRACT)
    with BuildSketch(Plane(origin=(-3.7, 1, 4.8), x_dir=(-0.7999999999983667, 0, -0.6000000000021778), z_dir=(0.6000000000021778, 0, -0.7999999999983667))) as fillet_4_piece_2:
        with BuildLine():
            CenterArc((0.585786438, -1.5), FILLET_4_R, 19.471220634, 70.528779366)
            Line((0.585786438, 0), (0.585786438, 0.03))
            Line((0.585786438, 0.03), (2, 0.03))
            Line((2, 0.03), (2.03, 0))
            ThreePointArc((2.03, 0), (2.03, -0.5), (2.028284271, -0.99))
            Line((2.028284271, -0.99), (2, -1))
        make_face()
    revolve(axis=Axis((-3.7, 1, 4.8), (0, 1, 0)), mode=Mode.SUBTRACT)

    # 草图7 → 凸台-拉伸5 (add, symmetric)
    with BuildSketch(Plane.XZ.offset(5.25)):
        with Locations(Location((3.7, 4.8, 0), (0, 0, 270))):
            Circle(SKETCH_7_R)
        with Locations(Location((-3.7, 4.8, 0), (0, 0, 270))):
            Circle(SKETCH_7_R)
    extrude(amount=EXTRUDE_5_DEPTH, both=True)

    # 草图8 → 切除-拉伸2 (cut, symmetric)
    with BuildSketch(Plane.XZ.offset(-2.5)):
        with BuildLine():
            Line((-19.5, 2.5), (-19.5, -2.5))
            ThreePointArc((-19.5, -2.5), (-21, -4), (-22.5, -2.5))
            Line((-22.5, -2.5), (-22.5, 2.5))
            ThreePointArc((-22.5, 2.5), (-21, 4), (-19.5, 2.5))
        make_face()
        with BuildLine():
            Line((22.5, 2.5), (22.5, -2.5))
            ThreePointArc((22.5, -2.5), (21, -4), (19.5, -2.5))
            Line((19.5, -2.5), (19.5, 2.5))
            ThreePointArc((19.5, 2.5), (21, 4), (22.5, 2.5))
        make_face()
    extrude(amount=CUT_EXTRUDE_2_DEPTH, both=True, mode=Mode.SUBTRACT)

    # 圆角5
    fillet_5_edges = [part_1.edges().sort_by_distance(p)[0] for p in [
        (3.7, -9.25, 7.8),
        (3.7, -1.25, 7.8),
        (-3.7, -9.25, 7.8),
        (-3.7, -1.25, 7.8),
    ]]
    fillet(fillet_5_edges, radius=FILLET_5_R)


solid = part_1.part
